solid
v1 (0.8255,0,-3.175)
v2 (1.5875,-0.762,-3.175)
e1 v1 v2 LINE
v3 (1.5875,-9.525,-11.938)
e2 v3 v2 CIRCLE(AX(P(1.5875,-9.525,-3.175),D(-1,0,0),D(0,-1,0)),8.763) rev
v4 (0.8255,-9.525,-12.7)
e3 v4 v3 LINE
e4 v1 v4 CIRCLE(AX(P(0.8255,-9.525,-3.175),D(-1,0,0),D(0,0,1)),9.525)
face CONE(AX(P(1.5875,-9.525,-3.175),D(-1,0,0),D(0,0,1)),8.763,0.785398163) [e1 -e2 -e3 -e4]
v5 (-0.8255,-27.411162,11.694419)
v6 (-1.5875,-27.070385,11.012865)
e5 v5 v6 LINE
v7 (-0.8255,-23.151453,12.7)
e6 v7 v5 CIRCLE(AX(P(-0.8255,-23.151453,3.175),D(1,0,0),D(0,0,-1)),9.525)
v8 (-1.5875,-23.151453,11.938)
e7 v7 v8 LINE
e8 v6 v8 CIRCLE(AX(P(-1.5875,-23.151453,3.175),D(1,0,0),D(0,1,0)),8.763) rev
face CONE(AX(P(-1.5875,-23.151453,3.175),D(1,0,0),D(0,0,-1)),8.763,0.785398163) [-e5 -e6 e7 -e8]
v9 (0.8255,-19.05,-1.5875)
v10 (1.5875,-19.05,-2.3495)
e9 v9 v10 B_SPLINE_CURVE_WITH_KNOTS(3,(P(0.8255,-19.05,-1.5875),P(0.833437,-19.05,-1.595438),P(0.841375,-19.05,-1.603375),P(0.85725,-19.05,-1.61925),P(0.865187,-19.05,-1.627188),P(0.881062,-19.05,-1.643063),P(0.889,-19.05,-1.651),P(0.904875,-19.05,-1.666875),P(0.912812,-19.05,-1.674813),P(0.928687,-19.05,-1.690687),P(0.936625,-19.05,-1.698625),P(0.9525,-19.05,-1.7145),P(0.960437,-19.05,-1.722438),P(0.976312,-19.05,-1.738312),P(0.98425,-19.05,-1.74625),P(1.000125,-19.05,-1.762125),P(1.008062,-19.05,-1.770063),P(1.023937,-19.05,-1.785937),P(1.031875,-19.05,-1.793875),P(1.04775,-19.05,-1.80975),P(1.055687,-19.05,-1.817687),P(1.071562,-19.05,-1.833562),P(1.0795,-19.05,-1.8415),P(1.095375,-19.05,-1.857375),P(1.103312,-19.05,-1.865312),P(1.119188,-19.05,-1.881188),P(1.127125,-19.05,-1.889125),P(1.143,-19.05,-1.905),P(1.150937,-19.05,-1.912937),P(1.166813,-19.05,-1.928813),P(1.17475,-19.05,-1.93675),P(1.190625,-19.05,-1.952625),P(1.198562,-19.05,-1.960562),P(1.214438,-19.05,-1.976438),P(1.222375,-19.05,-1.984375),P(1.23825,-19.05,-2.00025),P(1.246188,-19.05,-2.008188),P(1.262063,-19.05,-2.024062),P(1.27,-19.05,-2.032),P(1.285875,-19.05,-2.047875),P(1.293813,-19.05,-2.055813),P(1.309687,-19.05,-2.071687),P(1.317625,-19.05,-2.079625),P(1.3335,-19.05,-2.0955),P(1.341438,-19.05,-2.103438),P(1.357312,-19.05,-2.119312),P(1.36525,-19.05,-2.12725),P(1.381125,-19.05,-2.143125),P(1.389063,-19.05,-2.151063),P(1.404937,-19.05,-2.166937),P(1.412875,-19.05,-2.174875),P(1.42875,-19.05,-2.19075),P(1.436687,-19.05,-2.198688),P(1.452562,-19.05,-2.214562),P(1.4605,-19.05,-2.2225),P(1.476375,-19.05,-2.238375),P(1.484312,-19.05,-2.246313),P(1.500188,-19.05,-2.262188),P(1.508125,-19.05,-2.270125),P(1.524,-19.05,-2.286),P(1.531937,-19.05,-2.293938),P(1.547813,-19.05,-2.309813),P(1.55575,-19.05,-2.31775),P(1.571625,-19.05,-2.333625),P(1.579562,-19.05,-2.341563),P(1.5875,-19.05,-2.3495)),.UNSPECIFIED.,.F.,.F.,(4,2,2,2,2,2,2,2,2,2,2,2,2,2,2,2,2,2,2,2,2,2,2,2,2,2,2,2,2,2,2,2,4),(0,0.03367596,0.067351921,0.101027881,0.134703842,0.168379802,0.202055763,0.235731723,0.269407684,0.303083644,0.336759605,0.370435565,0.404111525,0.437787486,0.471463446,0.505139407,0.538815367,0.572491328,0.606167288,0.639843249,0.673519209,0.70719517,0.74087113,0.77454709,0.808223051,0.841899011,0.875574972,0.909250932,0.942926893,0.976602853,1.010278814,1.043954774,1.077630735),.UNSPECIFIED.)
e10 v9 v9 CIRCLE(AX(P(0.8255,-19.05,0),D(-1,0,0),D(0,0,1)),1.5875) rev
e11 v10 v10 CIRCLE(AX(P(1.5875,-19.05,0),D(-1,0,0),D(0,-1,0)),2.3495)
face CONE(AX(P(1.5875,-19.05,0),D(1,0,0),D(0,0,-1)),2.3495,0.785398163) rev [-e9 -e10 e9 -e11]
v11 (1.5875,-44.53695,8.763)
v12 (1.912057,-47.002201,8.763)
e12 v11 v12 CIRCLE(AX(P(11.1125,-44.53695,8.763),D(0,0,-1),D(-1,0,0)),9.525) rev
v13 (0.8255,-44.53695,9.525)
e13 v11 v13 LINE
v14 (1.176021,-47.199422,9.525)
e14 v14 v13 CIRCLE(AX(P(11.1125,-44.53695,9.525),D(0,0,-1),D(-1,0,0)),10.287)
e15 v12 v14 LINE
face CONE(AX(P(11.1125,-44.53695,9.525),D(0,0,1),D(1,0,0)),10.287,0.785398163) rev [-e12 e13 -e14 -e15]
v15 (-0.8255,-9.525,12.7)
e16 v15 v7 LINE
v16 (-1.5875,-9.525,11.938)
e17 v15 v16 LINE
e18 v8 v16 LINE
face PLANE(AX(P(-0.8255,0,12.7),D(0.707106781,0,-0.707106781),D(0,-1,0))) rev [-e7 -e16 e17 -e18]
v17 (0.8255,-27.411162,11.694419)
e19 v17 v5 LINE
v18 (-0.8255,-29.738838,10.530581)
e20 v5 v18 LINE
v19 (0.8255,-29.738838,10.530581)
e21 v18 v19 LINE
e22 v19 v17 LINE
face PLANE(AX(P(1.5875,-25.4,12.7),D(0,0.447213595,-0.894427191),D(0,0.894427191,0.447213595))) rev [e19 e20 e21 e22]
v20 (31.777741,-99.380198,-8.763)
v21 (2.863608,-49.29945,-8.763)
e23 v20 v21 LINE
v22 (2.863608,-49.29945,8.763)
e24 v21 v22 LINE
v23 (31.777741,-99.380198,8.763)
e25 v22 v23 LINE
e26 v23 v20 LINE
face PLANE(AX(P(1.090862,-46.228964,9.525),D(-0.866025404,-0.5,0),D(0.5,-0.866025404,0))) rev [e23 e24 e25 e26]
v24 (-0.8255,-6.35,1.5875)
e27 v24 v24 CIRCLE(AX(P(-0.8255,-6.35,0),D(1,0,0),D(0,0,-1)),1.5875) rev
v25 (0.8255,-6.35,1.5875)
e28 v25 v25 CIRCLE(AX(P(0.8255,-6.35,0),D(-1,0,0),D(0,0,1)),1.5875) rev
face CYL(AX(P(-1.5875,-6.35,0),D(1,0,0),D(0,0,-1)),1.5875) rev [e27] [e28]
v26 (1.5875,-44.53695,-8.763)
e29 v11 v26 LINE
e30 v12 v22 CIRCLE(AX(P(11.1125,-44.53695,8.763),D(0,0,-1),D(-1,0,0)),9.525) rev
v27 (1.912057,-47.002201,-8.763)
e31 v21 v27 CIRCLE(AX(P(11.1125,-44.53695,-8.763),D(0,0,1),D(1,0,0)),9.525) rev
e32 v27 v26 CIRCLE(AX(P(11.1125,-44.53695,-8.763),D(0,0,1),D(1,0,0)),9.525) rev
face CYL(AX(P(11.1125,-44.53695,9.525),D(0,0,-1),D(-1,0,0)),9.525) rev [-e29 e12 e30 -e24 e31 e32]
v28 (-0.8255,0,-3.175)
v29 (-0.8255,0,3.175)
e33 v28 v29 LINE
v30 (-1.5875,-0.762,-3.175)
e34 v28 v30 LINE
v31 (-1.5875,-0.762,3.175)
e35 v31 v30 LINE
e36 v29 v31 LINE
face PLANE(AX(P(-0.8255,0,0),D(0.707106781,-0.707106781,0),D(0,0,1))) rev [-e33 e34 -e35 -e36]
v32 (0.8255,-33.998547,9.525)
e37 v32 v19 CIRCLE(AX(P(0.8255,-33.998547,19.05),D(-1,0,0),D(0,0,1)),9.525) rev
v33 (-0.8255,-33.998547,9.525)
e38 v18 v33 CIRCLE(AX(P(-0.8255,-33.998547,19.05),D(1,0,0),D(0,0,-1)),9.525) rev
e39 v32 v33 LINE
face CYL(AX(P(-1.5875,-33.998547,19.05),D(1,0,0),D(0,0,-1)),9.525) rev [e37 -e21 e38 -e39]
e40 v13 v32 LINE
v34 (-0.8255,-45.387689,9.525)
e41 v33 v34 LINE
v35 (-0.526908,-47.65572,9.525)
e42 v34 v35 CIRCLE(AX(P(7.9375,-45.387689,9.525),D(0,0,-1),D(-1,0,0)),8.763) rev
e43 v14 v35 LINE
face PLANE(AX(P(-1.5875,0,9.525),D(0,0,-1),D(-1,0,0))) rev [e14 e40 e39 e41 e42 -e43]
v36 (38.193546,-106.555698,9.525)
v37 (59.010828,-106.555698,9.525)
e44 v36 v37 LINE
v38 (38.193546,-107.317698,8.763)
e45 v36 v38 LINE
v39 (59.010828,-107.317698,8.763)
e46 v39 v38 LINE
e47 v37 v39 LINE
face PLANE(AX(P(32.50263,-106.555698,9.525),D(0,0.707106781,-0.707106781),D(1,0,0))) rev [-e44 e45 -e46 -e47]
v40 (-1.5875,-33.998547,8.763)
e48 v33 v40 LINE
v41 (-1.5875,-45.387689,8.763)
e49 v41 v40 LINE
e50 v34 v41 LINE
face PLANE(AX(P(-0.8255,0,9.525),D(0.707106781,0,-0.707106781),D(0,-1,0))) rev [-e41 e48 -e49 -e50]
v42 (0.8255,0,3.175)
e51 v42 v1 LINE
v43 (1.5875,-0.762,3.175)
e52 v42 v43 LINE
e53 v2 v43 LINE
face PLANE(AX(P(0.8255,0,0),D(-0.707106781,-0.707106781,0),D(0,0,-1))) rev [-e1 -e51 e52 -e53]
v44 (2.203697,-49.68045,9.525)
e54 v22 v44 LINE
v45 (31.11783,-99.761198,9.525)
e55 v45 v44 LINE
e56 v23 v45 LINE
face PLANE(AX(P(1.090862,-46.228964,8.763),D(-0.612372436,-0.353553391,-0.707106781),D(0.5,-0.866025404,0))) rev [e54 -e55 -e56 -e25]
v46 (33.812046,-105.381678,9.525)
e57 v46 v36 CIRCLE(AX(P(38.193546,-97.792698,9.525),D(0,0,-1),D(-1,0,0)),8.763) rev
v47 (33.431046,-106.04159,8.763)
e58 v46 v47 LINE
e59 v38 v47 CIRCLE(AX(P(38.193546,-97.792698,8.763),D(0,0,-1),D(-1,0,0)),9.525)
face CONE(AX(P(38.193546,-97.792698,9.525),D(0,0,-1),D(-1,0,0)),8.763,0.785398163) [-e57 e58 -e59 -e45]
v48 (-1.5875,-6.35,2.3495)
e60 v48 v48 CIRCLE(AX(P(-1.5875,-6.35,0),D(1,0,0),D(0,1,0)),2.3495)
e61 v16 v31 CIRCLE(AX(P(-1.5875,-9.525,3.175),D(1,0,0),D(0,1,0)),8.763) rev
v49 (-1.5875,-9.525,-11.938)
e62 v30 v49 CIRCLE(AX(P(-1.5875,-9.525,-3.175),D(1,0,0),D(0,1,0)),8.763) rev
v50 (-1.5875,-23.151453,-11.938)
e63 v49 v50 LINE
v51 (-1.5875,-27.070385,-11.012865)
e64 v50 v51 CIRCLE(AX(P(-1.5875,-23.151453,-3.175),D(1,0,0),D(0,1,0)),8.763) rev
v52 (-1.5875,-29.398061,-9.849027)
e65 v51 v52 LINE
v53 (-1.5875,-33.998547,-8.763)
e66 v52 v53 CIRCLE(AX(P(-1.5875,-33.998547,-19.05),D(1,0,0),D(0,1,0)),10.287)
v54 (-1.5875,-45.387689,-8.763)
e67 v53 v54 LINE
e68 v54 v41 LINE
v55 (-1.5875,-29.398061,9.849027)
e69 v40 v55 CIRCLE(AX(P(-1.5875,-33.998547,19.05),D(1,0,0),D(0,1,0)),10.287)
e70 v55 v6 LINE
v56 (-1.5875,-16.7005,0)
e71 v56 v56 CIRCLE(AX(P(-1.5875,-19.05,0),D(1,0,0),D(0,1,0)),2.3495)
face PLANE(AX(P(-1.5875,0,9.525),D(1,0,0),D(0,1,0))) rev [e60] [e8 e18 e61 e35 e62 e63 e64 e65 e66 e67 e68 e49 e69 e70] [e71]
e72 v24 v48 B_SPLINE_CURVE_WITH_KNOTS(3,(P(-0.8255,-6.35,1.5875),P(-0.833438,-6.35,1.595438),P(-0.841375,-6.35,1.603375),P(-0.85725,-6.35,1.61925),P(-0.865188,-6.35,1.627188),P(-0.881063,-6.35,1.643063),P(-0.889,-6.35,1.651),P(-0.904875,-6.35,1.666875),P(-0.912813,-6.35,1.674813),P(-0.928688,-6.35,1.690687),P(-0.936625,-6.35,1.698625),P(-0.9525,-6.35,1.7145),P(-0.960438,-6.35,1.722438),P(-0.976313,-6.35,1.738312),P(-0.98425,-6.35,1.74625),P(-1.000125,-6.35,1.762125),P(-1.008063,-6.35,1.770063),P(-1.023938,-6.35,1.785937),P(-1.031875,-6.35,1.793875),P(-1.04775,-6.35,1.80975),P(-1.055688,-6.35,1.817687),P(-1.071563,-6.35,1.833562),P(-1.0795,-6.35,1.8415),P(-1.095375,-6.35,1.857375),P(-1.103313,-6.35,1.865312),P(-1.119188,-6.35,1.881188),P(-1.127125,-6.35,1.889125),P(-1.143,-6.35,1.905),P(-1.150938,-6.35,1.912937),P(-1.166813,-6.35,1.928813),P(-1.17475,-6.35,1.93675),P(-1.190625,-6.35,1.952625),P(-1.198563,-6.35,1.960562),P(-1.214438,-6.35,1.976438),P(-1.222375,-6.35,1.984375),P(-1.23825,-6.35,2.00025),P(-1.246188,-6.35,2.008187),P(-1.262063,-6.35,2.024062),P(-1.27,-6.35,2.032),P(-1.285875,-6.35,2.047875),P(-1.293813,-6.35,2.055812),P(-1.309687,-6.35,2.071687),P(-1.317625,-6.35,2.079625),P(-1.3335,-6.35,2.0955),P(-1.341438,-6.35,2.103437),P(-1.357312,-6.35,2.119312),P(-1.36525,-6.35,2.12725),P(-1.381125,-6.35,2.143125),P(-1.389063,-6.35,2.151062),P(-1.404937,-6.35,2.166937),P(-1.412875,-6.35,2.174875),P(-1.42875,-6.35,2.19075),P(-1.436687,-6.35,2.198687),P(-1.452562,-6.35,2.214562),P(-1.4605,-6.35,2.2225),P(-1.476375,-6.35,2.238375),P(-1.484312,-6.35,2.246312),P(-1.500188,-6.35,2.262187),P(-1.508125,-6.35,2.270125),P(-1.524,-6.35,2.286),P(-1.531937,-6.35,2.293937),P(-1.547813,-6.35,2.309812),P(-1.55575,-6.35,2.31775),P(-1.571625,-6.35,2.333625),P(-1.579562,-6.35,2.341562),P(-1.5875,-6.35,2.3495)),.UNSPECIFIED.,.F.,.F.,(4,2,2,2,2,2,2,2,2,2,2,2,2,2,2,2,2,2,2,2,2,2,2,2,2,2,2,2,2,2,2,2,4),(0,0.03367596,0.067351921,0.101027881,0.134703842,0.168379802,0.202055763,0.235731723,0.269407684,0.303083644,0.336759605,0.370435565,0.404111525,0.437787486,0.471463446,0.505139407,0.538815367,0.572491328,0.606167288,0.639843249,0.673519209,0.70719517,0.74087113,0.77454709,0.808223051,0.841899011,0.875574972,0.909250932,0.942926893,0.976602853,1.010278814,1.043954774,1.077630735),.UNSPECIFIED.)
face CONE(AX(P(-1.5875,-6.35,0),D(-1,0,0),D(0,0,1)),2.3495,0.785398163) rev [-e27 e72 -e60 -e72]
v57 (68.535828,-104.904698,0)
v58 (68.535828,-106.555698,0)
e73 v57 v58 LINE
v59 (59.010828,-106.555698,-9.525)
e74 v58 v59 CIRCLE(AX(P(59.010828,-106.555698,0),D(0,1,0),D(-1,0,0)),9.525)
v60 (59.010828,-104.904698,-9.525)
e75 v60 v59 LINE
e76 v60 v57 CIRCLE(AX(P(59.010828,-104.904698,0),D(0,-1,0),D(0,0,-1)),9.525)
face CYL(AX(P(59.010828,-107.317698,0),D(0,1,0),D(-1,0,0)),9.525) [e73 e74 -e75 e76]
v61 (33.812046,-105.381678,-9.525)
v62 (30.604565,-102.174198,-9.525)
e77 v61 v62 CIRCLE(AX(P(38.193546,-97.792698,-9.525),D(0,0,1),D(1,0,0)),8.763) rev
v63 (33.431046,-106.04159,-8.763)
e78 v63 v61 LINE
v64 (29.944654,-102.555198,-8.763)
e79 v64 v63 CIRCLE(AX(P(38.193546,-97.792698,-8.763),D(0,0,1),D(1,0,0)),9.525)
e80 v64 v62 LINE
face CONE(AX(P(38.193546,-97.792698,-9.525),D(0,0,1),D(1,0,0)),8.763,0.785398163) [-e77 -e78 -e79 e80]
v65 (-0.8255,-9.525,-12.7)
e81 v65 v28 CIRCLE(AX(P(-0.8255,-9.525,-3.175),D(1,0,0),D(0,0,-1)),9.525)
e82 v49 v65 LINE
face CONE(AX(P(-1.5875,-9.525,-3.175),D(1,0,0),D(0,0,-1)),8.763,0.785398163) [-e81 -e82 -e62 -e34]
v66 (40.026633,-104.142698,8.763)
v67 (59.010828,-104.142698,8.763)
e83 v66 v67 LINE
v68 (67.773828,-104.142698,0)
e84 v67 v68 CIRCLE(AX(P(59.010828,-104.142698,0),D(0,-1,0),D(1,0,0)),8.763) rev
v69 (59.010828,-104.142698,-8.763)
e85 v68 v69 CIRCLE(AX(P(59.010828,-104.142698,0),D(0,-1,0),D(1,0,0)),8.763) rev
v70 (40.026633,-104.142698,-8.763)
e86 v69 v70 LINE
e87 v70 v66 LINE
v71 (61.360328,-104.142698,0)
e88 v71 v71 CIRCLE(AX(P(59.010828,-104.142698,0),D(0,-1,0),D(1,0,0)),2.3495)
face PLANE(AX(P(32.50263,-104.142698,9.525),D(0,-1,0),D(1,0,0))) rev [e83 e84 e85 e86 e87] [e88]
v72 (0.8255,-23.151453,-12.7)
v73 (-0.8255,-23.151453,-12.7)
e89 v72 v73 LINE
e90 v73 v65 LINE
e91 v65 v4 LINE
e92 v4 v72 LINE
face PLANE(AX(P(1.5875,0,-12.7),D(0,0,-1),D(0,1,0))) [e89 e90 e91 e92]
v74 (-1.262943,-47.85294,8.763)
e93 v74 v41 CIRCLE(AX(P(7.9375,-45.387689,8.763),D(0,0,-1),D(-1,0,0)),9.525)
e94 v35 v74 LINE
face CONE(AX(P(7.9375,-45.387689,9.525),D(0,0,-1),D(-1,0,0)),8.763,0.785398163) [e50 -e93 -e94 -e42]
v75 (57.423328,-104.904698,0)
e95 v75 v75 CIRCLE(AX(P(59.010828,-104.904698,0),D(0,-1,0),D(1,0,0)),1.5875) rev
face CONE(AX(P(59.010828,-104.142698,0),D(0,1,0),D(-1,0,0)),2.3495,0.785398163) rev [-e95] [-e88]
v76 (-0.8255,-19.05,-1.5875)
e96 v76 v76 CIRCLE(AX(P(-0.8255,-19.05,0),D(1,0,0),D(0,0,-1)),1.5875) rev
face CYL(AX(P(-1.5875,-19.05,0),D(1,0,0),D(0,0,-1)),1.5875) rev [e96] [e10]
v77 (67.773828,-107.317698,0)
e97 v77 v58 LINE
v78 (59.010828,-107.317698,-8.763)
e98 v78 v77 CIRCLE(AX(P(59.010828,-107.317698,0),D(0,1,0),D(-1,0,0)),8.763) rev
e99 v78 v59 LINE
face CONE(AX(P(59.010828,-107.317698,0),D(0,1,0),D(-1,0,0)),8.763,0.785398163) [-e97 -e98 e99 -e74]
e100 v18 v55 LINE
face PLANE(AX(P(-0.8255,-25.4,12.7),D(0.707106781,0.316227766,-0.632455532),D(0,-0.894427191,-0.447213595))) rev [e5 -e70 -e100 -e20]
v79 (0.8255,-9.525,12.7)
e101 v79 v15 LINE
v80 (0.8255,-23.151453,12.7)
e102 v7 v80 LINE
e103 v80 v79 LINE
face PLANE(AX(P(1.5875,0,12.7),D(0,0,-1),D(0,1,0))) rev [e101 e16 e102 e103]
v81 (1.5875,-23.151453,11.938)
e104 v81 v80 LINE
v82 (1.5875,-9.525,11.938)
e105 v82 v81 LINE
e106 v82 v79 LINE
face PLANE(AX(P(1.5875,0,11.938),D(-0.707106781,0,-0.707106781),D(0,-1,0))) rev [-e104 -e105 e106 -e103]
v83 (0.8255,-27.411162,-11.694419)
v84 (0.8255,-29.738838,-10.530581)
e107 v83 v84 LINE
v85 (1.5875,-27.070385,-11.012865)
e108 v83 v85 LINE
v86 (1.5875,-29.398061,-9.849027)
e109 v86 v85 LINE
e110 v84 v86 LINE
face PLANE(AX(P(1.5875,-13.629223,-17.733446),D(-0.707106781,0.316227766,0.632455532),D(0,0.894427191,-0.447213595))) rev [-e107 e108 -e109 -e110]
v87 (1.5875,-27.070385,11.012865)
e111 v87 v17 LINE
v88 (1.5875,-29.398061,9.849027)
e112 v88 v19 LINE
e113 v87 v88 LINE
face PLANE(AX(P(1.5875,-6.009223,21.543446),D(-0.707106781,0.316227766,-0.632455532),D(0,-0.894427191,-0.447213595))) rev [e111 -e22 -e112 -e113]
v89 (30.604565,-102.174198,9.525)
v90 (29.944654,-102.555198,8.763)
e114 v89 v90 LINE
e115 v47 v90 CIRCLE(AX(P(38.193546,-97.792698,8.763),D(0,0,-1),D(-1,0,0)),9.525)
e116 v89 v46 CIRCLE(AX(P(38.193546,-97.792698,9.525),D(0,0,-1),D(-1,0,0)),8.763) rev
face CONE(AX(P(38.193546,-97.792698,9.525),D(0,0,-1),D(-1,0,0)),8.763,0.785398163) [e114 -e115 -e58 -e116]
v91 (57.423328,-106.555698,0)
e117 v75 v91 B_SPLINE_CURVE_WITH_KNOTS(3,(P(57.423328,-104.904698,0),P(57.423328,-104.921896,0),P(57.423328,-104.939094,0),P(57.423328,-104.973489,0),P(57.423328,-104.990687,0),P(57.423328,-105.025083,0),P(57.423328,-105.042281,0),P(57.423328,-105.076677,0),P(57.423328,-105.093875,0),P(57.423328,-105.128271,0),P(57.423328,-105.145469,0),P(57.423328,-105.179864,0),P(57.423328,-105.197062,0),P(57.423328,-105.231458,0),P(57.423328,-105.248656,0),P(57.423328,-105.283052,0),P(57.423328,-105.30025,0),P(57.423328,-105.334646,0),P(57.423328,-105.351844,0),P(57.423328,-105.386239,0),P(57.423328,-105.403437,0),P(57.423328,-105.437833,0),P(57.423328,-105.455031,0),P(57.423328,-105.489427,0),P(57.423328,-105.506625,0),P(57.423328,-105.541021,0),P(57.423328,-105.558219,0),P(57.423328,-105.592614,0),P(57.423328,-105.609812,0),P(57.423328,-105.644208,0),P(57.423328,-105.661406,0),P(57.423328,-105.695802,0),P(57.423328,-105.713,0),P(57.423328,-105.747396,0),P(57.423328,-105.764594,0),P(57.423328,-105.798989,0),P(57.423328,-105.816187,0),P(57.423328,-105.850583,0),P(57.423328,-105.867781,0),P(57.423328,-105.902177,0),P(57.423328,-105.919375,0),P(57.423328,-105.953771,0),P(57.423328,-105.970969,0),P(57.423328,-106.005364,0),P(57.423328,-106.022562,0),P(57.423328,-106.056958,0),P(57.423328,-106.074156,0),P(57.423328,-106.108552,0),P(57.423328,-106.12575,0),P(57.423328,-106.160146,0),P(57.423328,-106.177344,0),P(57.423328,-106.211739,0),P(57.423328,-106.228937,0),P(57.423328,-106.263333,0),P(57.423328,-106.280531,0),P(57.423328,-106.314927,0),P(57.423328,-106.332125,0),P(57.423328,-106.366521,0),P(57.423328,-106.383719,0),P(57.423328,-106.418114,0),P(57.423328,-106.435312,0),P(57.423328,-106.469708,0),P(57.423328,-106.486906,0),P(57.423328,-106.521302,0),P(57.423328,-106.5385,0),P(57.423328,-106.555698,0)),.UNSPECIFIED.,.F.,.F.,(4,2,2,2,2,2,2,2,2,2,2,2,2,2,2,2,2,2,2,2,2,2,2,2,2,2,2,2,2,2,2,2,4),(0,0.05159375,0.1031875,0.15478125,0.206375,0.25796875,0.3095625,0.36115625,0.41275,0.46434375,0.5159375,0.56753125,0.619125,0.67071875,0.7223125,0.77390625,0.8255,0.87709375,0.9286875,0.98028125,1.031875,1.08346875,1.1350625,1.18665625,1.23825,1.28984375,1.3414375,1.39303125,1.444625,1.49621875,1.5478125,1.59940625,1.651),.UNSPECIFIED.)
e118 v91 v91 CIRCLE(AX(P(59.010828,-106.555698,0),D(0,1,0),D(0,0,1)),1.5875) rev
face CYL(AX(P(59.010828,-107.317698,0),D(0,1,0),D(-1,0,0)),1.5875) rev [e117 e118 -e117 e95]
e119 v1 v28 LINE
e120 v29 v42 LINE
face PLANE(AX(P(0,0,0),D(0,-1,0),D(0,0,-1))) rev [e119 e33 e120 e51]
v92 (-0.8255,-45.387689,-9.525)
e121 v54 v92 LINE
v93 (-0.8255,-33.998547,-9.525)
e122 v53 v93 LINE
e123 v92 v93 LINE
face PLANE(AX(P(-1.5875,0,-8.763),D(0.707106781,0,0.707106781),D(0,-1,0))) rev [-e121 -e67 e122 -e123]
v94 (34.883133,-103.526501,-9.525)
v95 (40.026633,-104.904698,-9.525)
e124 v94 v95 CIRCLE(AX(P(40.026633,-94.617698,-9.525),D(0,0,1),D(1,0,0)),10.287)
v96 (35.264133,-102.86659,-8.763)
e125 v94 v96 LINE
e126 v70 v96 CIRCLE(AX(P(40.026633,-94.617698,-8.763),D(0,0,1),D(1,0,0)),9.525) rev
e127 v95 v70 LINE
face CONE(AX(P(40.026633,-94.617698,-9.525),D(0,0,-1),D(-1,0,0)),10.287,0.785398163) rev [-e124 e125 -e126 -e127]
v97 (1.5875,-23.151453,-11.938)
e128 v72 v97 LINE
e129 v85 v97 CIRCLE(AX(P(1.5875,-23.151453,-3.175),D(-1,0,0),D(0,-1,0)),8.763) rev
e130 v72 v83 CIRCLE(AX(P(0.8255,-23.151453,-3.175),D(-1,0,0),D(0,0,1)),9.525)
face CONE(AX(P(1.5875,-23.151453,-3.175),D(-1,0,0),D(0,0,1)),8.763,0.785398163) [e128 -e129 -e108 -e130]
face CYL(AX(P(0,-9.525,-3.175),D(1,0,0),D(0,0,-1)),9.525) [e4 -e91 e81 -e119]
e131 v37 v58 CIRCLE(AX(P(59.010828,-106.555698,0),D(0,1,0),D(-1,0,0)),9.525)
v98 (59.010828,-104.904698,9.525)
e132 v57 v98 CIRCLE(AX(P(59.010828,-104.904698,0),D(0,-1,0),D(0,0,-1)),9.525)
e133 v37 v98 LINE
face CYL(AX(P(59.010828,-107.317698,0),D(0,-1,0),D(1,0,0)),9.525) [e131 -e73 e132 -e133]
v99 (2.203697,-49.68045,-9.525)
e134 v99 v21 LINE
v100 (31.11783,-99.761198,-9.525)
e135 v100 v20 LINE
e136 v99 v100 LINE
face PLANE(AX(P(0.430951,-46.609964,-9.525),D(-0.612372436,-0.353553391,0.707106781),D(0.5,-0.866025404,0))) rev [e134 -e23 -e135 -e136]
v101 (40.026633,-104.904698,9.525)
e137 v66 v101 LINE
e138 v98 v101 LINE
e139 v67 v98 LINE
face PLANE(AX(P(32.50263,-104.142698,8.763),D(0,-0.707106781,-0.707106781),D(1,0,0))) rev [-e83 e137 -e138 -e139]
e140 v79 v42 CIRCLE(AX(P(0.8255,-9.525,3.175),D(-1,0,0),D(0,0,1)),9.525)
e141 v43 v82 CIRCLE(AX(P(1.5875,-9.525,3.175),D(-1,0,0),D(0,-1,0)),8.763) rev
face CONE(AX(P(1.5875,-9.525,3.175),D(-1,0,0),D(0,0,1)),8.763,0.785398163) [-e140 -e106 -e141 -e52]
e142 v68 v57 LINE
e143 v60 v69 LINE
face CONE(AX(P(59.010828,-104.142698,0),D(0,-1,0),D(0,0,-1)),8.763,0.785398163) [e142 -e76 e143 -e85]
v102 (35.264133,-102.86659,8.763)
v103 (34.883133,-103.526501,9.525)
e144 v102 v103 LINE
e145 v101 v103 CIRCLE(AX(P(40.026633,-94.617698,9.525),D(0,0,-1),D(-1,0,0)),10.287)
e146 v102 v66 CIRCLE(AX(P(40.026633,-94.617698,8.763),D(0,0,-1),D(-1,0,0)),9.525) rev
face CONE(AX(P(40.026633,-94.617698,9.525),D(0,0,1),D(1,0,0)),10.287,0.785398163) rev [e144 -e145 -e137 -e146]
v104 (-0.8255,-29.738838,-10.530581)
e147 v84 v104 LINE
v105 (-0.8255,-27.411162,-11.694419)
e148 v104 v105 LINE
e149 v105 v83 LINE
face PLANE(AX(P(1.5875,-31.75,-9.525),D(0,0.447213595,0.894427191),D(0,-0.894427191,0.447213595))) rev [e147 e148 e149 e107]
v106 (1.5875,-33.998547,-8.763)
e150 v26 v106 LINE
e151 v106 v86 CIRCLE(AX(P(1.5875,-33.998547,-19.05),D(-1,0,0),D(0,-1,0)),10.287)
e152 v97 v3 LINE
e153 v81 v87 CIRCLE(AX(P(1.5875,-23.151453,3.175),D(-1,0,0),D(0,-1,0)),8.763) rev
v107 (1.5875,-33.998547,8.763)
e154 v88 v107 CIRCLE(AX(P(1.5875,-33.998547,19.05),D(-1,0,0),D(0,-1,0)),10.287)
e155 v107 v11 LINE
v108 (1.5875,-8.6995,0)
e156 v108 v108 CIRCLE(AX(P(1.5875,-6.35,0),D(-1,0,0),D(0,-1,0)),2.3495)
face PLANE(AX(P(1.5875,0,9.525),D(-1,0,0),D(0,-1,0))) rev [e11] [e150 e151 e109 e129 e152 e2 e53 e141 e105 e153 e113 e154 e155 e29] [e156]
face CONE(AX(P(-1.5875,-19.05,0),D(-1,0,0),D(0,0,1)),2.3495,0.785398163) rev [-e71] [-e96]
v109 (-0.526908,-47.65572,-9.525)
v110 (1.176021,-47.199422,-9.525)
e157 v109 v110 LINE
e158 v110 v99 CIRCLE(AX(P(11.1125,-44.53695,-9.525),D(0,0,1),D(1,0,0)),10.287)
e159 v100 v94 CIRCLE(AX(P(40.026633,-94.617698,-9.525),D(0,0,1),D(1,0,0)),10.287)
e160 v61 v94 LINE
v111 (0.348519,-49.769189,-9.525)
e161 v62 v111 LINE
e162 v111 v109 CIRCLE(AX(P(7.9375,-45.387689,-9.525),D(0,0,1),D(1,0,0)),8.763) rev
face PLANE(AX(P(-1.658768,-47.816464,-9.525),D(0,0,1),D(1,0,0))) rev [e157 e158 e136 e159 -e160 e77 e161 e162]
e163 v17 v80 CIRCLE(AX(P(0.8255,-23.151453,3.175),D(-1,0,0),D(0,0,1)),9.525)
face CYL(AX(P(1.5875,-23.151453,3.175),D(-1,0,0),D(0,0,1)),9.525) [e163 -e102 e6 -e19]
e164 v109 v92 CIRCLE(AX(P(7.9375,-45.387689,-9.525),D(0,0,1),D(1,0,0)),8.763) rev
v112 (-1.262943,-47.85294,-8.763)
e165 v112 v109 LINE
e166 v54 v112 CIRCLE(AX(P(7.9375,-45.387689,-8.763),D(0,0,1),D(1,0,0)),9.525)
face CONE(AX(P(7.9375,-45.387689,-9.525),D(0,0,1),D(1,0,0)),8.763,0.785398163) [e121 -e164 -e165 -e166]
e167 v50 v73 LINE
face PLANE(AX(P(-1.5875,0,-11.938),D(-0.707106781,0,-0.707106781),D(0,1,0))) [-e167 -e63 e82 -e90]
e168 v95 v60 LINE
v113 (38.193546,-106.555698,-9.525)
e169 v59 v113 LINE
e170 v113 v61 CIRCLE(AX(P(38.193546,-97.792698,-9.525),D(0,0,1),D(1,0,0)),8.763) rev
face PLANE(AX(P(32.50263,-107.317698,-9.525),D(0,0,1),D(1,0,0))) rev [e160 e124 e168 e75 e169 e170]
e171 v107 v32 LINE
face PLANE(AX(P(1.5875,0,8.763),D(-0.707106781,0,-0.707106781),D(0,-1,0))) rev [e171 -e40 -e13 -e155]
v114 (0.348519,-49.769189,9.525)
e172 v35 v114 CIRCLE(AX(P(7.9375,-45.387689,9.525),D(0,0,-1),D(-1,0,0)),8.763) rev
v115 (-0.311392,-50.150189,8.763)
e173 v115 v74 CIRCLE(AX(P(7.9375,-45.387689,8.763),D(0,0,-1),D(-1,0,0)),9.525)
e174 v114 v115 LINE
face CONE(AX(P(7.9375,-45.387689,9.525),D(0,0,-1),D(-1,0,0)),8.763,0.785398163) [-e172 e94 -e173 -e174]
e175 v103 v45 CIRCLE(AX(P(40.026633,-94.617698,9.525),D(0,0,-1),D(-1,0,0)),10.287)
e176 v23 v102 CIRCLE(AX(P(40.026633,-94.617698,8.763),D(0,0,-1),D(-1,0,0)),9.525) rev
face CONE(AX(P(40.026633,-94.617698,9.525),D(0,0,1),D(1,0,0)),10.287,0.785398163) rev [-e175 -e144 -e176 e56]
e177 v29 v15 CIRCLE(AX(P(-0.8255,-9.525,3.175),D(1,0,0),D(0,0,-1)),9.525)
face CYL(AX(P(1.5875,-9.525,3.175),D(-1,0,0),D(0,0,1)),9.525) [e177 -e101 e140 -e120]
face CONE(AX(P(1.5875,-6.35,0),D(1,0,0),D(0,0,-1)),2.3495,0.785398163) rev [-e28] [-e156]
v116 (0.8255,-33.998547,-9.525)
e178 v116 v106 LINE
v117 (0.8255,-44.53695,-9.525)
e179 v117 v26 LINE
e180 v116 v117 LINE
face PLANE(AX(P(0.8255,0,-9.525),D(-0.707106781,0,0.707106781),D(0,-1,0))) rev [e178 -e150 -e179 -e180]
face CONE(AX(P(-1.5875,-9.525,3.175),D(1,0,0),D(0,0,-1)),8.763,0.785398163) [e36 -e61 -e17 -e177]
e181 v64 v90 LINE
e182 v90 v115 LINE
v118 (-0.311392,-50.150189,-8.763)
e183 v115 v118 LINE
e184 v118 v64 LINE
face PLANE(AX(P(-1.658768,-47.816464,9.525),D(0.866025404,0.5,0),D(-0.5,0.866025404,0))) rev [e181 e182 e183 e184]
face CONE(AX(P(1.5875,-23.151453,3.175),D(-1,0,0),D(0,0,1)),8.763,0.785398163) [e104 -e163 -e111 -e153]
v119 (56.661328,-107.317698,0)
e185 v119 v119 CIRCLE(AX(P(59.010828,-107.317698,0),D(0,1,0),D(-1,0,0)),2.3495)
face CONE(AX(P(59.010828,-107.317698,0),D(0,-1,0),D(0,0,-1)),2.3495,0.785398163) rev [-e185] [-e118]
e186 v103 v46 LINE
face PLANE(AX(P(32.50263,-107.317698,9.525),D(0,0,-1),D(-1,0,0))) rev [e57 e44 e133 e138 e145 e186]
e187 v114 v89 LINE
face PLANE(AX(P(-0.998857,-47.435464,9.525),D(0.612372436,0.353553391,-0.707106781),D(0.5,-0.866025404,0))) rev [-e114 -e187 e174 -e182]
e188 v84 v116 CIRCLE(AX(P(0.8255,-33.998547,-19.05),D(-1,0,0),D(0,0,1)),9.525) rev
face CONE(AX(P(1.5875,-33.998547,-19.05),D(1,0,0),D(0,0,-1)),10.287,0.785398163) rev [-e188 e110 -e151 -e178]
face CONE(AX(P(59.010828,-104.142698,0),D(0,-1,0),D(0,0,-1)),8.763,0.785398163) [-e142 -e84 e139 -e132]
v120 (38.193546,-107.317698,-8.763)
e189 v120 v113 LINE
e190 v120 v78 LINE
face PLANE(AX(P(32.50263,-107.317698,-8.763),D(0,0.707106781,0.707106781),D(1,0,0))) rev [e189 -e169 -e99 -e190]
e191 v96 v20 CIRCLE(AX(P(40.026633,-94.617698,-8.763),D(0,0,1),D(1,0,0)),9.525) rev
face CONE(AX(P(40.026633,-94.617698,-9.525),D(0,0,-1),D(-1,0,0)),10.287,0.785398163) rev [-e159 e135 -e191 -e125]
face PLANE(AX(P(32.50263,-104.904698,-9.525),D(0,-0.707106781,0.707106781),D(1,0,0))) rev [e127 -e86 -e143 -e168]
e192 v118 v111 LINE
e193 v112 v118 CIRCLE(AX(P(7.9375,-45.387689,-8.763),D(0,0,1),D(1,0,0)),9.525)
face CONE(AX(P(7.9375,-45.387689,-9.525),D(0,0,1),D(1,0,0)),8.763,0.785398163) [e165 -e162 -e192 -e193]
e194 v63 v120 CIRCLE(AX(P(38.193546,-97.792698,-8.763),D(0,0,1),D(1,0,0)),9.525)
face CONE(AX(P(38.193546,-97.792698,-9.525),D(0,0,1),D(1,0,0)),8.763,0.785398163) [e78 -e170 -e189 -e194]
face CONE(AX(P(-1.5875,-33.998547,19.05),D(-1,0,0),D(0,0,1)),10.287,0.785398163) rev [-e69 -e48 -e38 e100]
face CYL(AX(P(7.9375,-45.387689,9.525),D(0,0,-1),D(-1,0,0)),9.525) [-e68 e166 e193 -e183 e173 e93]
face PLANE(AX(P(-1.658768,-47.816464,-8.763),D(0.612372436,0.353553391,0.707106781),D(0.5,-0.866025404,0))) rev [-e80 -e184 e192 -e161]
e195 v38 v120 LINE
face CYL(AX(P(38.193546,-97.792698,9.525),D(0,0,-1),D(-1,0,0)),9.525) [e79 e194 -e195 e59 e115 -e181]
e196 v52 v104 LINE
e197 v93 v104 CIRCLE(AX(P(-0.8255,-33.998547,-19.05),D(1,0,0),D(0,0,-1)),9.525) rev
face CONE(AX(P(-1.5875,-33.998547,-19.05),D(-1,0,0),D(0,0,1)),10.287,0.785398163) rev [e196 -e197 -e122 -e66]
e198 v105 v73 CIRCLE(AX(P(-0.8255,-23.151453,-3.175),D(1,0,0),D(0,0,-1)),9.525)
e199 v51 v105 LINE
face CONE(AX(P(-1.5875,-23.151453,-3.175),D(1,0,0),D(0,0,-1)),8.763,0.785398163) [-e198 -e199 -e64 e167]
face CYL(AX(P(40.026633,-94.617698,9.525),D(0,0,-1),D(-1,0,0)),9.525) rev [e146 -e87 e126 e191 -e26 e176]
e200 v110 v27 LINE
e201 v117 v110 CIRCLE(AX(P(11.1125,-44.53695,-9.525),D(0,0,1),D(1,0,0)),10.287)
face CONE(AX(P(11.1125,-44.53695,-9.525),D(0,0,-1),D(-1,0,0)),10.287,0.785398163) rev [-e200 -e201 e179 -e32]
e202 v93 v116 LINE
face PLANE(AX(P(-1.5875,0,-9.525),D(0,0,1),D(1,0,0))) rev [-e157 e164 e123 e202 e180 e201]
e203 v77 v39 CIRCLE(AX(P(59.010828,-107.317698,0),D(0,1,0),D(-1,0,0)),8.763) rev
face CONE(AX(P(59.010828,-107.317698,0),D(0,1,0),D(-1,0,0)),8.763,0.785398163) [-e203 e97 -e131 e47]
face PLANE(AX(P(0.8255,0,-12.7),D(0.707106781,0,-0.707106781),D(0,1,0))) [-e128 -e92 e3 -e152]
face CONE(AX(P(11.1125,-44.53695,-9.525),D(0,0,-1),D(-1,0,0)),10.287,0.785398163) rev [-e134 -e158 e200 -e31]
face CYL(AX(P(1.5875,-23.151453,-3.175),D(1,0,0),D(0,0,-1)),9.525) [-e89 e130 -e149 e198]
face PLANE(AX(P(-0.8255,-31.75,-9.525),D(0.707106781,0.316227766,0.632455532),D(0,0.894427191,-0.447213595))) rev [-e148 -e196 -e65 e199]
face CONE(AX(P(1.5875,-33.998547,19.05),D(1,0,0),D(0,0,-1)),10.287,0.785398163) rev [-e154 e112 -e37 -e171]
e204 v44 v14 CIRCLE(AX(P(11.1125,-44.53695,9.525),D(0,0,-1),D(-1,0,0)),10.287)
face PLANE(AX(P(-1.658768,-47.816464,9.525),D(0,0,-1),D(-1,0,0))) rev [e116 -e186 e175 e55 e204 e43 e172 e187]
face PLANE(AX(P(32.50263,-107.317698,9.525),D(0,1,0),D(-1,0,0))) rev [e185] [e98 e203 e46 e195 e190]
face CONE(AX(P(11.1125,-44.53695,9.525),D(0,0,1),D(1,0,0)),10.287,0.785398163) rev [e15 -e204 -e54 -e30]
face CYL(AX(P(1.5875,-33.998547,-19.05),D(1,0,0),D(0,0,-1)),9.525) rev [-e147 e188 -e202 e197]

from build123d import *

# Parameters (mm, degrees)
SKETCH2_W               = 3.175
SKETCH2_H               = 19.05
BOSS_EXTRUDE1_DEPTH     = 1.5875
CUT_EXTRUDE1_DEPTH      = 128.966941084
CUT_EXTRUDE1_DEPTH_BACK = 128.966941084
SKETCH8_R               = 1.5875
CUT_EXTRUDE2_DEPTH      = 126.316205076
CUT_EXTRUDE2_DEPTH_BACK = 126.316205076
SKETCH9_R               = 1.5875
FILLET1_R               = 9.525
CHAMFER1_SIZE           = 0.762


with BuildPart() as part:
    # Sweep1: sweep along a path in Sketch1
    with BuildLine(Plane.XY) as sweep1_path:
        Line((0, 0), (0, -47.5145354))
        Line((0, -47.5145354), (33.61082832, -105.730197734))
        Line((33.61082832, -105.730197734), (68.53582832, -105.730197734))
    # Sketch2 → Sweep1 (sweep)
    with BuildSketch(Plane(origin=(0, 0, 0), x_dir=(1, 0, 0), z_dir=(0, 1, 0))):
        Rectangle(SKETCH2_W, SKETCH2_H)
    sweep(path=sweep1_path.line, transition=Transition.RIGHT)

    # Sketch7 → Boss-Extrude1 (add, symmetric)
    with BuildSketch(Plane(origin=(0, 0, 0), x_dir=(0, 0, -1), z_dir=(1, 0, 0))):
        Polygon((-12.7, -25.4), (-9.525, -31.75), (9.525, -31.75), (12.7, -25.4), (12.7, 0), (-12.7, 0), align=None)
    extrude(amount=BOSS_EXTRUDE1_DEPTH, both=True)

    # Sketch8 → Cut-Extrude1 (cut, two sides: drawn at the far end of the back side and taken through both)
    with BuildSketch(Plane(origin=(0, 0, 0), x_dir=(0, 0, -1), z_dir=(1, 0, 0)).offset(-CUT_EXTRUDE1_DEPTH_BACK)):
        with Locations((0, -6.35)):
            Circle(SKETCH8_R)
        with Locations((0, -19.05)):
            Circle(SKETCH8_R)
    extrude(amount=CUT_EXTRUDE1_DEPTH + CUT_EXTRUDE1_DEPTH_BACK, mode=Mode.SUBTRACT)

    # Sketch9 → Cut-Extrude2 (cut, two sides: drawn at the far end of the back side and taken through both)
    with BuildSketch(Plane(origin=(0, -104.142697734, 0), x_dir=(1, 0, 0), z_dir=(0, 1, 0)).offset(-CUT_EXTRUDE2_DEPTH_BACK)):
        with Locations(Location((59.01082832, 0, 0), (0, 0, 180))):
            Circle(SKETCH9_R)
    extrude(amount=CUT_EXTRUDE2_DEPTH + CUT_EXTRUDE2_DEPTH_BACK, mode=Mode.SUBTRACT)

    # Fillet1
    fillet1_edges = [part.edges().sort_by_distance(p)[0] for p in [
        (0, -31.75, -9.525),
        (0, -25.4, -12.7),
        (0, -31.75, 9.525),
        (0, -25.4, 12.7),
        (0, 0, -12.7),
        (0, 0, 12.7),
        (68.53582832, -105.730197734, -9.525),
        (68.53582832, -105.730197734, 9.525),
        (1.5875, -47.089166057, 0),
        (-1.5875, -47.939904743, 0),
        (32.694284767, -107.317697734, 0),
        (34.527371872, -104.142697734, 0),
    ]]
    fillet(fillet1_edges, radius=FILLET1_R - 0.0001)  # a hair under: the kernel refuses the full size

    # Chamfer1
    chamfer1_edges = [part.edges().sort_by_distance(p)[0] for p in [
        (14.816638805, -76.352706607, 9.525),
        (14.816638805, -76.352706607, -9.525),
        (33.431038346, -106.041603103, -9.525),
        (-1.262946903, -47.852941003, -9.525),
        (-1.5875, -39.693119679, -9.525),
        (-1.262946903, -47.852941003, -9.525),
        (-1.5875, 0, 0),
        (-1.5875, -16.338188061, -12.7),
        (-1.5875, -28.575, -11.1125),
        (-1.5875, -39.693119679, 9.525),
        (-1.5875, -28.575, 11.1125),
        (-1.5875, -16.338188061, 12.7),
        (-1.5875, -2.78977862, 9.91022138),
        (-1.5875, -2.78977862, -9.91022138),
        (-1.5875, -25.339849714, 12.4451993),
        (-1.5875, -25.339849714, -12.4451993),
        (-1.262946903, -47.852941003, 9.525),
        (33.431038346, -106.041603103, 9.525),
        (-1.262946903, -47.852941003, 9.525),
        (48.602208333, -107.317697734, -9.525),
        (48.602208333, -107.317697734, 9.525),
        (65.7460497, -107.317697734, 6.73522138),
        (65.7460497, -107.317697734, -6.73522138),
        (49.518751885, -104.142697734, -9.525),
        (33.431038346, -106.041603103, -9.525),
        (49.518751885, -104.142697734, 9.525),
        (33.431038346, -106.041603103, 9.525),
        (65.7460497, -104.142697734, 6.73522138),
        (65.7460497, -104.142697734, -6.73522138),
        (1.912053097, -47.002202317, 9.525),
        (1.912053097, -47.002202317, 9.525),
        (1.912053097, -47.002202317, -9.525),
        (1.912053097, -47.002202317, -9.525),
        (35.264125451, -102.866603103, 9.525),
        (35.264125451, -102.866603103, 9.525),
        (35.264125451, -102.866603103, -9.525),
        (35.264125451, -102.866603103, -9.525),
        (-1.5875, -31.810150286, -9.7798007),
        (1.5875, -31.810150286, -9.7798007),
        (-1.5875, -31.810150286, 9.7798007),
        (1.5875, -31.810150286, 9.7798007),
        (-1.5875, -6.35, 1.5875),
        (1.5875, -6.35, 1.5875),
        (-1.5875, -19.05, 1.5875),
        (1.5875, -19.05, 1.5875),
        (60.59832832, -107.317697734, 0),
        (60.59832832, -104.142697734, 0),
        (17.320682357, -74.339837264, -9.525),
        (17.320682357, -74.339837264, 9.525),
        (1.5875, 0, 0),
        (1.5875, -16.338188061, 12.7),
        (1.5875, -28.575, 11.1125),
        (1.5875, -39.267750336, 9.525),
        (1.5875, -39.267750336, -9.525),
        (1.5875, -28.575, -11.1125),
        (1.5875, -16.338188061, -12.7),
        (1.5875, -2.78977862, 9.91022138),
        (1.5875, -2.78977862, -9.91022138),
        (1.5875, -25.339849714, 12.4451993),
        (1.5875, -25.339849714, -12.4451993),
    ]]
    chamfer(chamfer1_edges, length=CHAMFER1_SIZE)


solid = part.part
